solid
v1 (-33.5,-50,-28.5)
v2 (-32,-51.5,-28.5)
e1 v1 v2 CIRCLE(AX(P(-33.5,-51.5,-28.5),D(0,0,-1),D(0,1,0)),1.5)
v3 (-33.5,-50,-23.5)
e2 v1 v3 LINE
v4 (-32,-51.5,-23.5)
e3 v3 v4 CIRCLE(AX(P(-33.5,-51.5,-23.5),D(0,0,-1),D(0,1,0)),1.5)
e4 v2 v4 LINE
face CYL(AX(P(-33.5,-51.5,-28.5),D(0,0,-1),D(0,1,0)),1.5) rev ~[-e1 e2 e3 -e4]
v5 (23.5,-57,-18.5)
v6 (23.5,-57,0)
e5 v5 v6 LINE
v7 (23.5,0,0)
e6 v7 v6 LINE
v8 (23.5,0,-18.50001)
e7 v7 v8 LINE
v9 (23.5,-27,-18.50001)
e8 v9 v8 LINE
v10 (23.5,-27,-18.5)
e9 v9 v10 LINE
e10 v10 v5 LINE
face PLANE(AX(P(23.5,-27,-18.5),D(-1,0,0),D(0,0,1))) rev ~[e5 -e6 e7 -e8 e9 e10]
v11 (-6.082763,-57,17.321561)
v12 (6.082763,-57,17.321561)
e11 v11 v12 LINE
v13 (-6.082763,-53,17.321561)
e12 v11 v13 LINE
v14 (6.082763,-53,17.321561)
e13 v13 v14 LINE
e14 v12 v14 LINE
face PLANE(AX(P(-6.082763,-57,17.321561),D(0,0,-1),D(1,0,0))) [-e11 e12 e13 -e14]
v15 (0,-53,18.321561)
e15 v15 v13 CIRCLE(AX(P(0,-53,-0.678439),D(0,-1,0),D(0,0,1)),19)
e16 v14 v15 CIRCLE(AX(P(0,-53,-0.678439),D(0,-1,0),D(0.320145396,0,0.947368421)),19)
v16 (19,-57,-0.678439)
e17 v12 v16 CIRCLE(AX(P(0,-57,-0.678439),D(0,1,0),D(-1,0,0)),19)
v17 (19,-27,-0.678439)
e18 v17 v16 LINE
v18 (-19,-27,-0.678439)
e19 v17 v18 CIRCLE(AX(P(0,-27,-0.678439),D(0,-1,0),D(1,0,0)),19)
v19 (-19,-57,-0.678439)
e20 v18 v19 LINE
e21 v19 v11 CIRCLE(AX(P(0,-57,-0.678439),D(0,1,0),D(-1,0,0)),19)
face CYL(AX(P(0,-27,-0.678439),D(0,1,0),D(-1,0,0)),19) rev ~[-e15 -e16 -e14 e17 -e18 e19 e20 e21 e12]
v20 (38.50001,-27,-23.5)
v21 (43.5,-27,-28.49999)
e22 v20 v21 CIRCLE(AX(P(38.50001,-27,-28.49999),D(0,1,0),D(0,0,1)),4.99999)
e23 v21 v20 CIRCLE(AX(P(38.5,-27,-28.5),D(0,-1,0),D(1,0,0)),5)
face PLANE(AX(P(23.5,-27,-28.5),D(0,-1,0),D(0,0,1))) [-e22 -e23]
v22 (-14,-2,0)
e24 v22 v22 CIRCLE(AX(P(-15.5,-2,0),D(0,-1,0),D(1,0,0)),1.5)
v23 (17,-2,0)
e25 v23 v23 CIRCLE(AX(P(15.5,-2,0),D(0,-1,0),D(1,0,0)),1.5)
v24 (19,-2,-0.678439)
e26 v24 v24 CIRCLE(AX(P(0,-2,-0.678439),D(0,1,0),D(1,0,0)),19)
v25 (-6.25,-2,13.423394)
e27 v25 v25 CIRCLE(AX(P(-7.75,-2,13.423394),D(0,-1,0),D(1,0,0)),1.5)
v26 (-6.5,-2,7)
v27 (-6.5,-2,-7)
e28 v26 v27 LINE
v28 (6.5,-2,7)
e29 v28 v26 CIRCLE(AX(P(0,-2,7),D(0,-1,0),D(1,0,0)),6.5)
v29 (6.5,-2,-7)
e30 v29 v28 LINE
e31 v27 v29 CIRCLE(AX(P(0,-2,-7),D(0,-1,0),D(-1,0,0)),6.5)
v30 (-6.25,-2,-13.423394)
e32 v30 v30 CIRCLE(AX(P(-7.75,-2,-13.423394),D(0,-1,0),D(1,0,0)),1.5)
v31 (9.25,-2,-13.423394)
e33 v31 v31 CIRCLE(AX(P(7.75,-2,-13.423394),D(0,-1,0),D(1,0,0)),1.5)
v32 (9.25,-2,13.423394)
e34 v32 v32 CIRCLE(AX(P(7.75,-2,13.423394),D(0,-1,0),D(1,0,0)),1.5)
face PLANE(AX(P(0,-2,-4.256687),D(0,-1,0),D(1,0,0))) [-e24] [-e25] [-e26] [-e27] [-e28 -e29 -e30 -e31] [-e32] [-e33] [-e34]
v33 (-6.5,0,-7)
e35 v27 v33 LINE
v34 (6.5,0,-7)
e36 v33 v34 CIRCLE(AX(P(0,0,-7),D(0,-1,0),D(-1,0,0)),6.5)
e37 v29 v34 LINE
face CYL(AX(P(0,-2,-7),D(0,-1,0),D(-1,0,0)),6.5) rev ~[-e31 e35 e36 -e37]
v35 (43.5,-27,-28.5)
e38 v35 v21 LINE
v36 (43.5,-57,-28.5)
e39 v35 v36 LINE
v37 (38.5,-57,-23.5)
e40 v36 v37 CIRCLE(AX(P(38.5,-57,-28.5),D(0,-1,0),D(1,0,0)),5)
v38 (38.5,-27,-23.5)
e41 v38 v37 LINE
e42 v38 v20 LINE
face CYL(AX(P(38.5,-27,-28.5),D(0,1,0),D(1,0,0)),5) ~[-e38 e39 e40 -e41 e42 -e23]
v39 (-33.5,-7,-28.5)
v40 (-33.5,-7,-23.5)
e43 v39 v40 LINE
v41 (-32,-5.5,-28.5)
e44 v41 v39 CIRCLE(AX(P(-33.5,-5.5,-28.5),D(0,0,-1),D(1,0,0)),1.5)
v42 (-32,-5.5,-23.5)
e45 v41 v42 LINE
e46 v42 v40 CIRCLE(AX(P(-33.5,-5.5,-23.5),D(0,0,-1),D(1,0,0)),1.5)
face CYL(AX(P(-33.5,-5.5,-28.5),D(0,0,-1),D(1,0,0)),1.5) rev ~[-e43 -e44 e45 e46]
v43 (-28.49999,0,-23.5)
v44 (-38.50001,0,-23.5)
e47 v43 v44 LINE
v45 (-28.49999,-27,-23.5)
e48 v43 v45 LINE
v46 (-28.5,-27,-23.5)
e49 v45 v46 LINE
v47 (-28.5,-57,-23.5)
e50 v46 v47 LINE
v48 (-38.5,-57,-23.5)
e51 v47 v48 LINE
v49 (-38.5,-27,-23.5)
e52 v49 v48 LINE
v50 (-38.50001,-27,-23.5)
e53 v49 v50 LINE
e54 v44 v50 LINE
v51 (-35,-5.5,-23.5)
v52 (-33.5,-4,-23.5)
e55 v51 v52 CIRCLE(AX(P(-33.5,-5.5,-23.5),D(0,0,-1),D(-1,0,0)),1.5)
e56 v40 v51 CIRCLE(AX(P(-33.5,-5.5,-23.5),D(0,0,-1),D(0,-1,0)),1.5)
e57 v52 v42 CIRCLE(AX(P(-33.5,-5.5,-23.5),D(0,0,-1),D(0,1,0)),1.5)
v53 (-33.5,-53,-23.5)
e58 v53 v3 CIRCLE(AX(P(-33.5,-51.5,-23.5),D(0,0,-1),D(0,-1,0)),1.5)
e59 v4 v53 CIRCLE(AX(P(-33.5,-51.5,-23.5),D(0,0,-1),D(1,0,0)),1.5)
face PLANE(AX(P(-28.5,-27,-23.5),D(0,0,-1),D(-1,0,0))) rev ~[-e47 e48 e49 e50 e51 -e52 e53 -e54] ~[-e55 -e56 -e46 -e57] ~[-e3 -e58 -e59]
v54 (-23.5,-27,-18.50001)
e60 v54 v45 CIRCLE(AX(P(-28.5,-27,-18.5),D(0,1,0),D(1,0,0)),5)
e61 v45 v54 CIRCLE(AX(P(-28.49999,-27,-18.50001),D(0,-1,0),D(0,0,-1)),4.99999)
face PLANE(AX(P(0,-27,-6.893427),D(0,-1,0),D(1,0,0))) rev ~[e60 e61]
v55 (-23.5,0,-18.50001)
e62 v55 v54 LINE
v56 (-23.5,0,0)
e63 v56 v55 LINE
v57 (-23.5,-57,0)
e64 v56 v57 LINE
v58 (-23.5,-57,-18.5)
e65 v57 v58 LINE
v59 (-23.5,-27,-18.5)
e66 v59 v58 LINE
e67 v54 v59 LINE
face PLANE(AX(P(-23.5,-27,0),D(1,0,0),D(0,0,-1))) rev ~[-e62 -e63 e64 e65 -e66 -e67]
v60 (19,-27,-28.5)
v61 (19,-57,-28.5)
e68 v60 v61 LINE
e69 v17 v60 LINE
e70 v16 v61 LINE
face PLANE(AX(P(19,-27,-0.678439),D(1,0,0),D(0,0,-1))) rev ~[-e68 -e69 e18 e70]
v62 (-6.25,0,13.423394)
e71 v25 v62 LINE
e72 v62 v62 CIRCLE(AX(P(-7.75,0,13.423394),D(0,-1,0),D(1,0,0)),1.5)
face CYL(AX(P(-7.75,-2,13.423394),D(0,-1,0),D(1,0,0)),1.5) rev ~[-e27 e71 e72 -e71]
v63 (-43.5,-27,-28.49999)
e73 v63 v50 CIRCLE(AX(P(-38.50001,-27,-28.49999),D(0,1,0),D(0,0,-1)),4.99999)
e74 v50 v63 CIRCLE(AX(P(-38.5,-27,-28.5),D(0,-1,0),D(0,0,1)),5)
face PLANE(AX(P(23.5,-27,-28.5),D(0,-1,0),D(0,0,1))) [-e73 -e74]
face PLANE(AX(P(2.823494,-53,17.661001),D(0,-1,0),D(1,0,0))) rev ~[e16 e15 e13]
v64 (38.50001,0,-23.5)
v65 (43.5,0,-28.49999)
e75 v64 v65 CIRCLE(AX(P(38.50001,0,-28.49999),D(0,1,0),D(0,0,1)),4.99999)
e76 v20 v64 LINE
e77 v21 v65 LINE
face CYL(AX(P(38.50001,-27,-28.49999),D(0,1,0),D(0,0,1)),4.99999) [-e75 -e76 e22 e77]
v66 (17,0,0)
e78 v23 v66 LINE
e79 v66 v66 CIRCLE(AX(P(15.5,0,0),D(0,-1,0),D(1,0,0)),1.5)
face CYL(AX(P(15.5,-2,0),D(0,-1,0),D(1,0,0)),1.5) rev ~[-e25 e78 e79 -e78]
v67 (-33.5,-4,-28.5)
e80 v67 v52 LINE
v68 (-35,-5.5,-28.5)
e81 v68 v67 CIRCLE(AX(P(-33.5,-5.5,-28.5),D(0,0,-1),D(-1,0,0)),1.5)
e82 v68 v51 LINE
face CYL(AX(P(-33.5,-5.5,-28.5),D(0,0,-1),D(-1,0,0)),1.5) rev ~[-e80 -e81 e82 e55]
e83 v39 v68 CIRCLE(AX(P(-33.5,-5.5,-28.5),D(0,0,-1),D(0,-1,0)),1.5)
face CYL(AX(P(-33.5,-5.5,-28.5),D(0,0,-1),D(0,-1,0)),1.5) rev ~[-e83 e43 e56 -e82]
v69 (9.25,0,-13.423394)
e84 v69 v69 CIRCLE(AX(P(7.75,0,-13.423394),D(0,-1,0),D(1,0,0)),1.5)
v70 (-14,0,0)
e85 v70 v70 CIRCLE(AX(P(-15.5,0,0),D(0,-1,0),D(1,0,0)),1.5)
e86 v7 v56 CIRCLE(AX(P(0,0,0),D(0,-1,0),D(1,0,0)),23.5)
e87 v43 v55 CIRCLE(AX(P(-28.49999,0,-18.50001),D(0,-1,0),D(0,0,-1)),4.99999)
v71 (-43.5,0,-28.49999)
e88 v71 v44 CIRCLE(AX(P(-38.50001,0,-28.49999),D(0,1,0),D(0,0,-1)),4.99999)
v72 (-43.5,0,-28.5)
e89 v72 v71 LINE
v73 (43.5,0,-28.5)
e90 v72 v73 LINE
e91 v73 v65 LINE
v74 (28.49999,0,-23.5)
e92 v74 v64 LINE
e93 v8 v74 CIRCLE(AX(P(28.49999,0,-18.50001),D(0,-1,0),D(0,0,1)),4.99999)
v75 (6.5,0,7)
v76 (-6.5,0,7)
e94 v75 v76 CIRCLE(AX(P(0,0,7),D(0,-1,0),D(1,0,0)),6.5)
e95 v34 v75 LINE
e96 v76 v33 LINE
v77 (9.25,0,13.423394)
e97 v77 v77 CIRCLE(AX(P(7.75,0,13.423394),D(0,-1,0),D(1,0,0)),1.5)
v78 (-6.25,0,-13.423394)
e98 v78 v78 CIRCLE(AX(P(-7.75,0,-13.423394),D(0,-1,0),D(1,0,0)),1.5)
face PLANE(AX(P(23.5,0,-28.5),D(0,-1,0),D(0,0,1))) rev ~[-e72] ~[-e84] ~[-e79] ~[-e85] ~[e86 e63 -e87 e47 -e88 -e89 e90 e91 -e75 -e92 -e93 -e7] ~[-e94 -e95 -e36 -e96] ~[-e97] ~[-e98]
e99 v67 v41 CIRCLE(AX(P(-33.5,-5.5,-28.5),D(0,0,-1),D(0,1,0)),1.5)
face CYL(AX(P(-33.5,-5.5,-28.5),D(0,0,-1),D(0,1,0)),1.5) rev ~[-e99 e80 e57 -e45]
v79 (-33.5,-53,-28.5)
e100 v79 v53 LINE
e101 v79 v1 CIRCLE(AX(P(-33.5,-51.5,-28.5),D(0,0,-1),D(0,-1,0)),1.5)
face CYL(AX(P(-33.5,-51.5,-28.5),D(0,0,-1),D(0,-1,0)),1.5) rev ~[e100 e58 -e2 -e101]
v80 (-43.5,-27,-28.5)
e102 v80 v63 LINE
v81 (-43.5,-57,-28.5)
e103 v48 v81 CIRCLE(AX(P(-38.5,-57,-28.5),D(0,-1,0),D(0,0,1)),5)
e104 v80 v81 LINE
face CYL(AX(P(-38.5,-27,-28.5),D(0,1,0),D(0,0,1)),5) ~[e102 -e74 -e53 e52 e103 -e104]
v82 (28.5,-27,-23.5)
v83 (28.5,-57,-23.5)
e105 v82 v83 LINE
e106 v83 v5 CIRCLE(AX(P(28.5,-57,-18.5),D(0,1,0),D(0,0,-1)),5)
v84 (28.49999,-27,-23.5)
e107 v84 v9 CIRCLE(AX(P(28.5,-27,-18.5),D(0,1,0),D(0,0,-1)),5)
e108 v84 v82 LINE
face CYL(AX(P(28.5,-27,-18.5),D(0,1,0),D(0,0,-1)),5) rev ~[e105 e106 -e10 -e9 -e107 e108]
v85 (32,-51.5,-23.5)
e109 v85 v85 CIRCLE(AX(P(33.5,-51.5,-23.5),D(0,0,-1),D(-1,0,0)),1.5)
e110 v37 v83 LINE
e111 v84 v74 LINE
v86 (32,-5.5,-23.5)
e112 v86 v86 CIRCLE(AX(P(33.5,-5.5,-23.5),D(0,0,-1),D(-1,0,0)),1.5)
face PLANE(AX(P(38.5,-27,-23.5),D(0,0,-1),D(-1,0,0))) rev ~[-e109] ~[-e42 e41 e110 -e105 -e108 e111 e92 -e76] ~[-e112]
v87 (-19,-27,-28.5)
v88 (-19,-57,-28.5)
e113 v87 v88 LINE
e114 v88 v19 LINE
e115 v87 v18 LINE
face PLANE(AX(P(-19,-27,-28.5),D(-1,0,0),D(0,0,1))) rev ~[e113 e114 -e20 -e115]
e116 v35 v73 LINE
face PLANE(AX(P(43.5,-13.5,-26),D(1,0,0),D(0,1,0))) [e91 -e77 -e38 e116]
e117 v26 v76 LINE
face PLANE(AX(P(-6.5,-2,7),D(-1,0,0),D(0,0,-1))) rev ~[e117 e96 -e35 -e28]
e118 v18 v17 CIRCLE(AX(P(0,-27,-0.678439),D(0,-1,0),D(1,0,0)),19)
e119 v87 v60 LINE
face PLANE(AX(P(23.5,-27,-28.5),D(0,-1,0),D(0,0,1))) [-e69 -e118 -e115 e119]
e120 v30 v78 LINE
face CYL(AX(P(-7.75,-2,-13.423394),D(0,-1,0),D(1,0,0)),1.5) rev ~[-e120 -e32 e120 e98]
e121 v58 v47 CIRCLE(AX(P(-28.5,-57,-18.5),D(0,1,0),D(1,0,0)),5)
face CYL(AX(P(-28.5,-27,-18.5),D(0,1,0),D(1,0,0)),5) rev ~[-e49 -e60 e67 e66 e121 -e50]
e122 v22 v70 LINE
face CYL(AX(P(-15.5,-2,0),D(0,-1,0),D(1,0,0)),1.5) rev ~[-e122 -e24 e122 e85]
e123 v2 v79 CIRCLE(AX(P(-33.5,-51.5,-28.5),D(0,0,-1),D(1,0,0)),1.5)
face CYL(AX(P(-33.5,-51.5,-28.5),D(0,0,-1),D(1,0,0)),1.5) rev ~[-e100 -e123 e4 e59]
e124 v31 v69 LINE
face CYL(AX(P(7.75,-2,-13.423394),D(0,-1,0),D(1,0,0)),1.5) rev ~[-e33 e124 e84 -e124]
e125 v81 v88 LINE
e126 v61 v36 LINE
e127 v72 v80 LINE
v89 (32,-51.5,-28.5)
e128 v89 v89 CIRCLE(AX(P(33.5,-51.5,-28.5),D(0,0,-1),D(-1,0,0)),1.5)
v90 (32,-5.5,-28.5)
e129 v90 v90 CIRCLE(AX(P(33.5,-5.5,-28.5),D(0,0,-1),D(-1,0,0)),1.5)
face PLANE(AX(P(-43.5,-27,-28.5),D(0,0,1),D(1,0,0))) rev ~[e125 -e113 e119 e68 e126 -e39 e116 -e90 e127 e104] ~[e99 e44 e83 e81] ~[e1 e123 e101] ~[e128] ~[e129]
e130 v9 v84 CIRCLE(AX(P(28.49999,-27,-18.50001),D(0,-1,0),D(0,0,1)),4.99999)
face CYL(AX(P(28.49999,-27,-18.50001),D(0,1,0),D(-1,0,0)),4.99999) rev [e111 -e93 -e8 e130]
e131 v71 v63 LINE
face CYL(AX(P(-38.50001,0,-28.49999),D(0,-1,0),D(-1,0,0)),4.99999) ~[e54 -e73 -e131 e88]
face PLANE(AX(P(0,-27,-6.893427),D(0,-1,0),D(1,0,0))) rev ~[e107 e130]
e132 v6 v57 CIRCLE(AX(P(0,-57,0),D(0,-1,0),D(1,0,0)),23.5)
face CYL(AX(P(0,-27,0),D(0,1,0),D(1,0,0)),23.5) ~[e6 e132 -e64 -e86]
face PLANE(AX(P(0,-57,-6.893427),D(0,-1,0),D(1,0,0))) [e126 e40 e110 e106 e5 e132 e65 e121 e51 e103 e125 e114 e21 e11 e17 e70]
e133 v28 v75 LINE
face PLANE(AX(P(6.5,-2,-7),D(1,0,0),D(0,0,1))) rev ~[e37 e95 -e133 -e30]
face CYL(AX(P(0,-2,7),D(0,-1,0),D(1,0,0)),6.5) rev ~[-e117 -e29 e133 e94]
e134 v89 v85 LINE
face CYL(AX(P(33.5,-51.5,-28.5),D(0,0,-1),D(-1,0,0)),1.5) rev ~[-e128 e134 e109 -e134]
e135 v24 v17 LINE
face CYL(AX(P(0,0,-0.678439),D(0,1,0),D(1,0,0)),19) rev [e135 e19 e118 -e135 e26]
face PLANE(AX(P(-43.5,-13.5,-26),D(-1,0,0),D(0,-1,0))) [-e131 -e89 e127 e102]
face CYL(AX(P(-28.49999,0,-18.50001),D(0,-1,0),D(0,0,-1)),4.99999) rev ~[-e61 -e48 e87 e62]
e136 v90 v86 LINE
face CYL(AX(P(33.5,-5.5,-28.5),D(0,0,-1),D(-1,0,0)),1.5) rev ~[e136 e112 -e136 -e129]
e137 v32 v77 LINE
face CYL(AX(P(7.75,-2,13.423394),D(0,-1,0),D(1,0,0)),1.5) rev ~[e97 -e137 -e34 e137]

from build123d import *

# Parameters (mm, degrees)
F1_DEPTH  = 2
F2_R      = 1.5
F3_DEPTH  = 5
F4_R      = 19
F5_DEPTH  = 27
F6_W      = 47
F6_H      = 27
F7_DEPTH  = 5
F8_W      = 27
F8_H      = 5
F9_DEPTH  = 20
F10_W     = 27
F10_H     = 5
F11_DEPTH = 20
F12_R     = 4.99999
F14_DEPTH = 30
F16_DEPTH = 4
F18_DEPTH = 25


# Not quite as in the source:
# - a fillet or chamfer is up to 0.001 mm smaller than in the source, because OpenCascade refuses the exact size


with BuildPart() as f1:
    # F0 (on Front) → F1 (new body)
    with BuildSketch(Plane.XZ):
        with BuildLine():
            Line((-23.5, -23.5), (0, -23.5))
            Line((0, -23.5), (23.5, -23.5))
            Line((23.5, -23.5), (23.5, 0))
            ThreePointArc((23.5, 0), (0, 23.5), (-23.5, 0))
            Line((-23.5, 0), (-23.5, -23.5))
        make_face()
    extrude(amount=F1_DEPTH)

    # F2 (on face) → F3 (cut)
    with BuildSketch(Plane.XZ.offset(2)):
        with Locations((15.5, 0)):
            Circle(F2_R)
        with Locations((7.75, 13.4233937587)):
            Circle(F2_R)
        with Locations((-7.75, 13.4233937587)):
            Circle(F2_R)
        with Locations((-15.5, 0)):
            Circle(F2_R)
        with Locations((-7.75, -13.4233937587)):
            Circle(F2_R)
        with Locations((7.75, -13.4233937587)):
            Circle(F2_R)
        with BuildLine():
            Line((6.5, -7), (6.5, 7))
            ThreePointArc((6.5, 7), (0, 13.5), (-6.5, 7))
            Line((-6.5, 7), (-6.5, -7))
            ThreePointArc((-6.5, -7), (0, -13.5), (6.5, -7))
        make_face()
    extrude(amount=-F3_DEPTH, mode=Mode.SUBTRACT)

    # F4 (on Front) → F5 (join)
    with BuildSketch(Plane.XZ):
        with BuildLine():
            ThreePointArc((23.5, 0), (0, 23.5), (-23.5, 0))
            Line((-23.5, 0), (-23.5, -23.5))
            Line((-23.5, -23.5), (23.5, -23.5))
            Line((23.5, -23.5), (23.5, 0))
        make_face()
        with Locations((0, -0.6784388353)):
            Circle(F4_R, mode=Mode.SUBTRACT)
    extrude(amount=F5_DEPTH)

    # F6 (on face) → F7 (join)
    with BuildSketch(Plane(origin=(0, 0, -23.5), x_dir=(1, 0, 0), z_dir=(0, 0, -1))):
        with Locations((0, 13.5)):
            Rectangle(F6_W, F6_H)
    extrude(amount=F7_DEPTH)

    # F8 (on face) → F9 (join)
    with BuildSketch(Plane(origin=(-23.5, 0, 0), x_dir=(0, -1, 0), z_dir=(-1, 0, 0))):
        with Locations((13.5, -26)):
            Rectangle(F8_W, F8_H)
    extrude(amount=F9_DEPTH)

    # F10 (on face) → F11 (join)
    with BuildSketch(Plane.YZ.offset(23.5)):
        with Locations((-13.5, -26)):
            Rectangle(F10_W, F10_H)
    extrude(amount=F11_DEPTH)

    # F12 (radius 5 in the source; OpenCascade refuses exactly that, so slightly less here)
    f12_edges = [f1.edges().sort_by_distance(p)[0] for p in [
        (23.5, -13.5, -23.5),
        (43.5, -13.5, -23.5),
        (-23.5, -13.5, -23.5),
        (-43.5, -13.5, -23.5),
    ]]
    fillet(f12_edges, radius=F12_R)

    # F13 (on face) → F14 (join)
    with BuildSketch(Plane.XZ.offset(27)):
        with BuildLine():
            Line((23.5, -18.5), (23.5, 0))
            ThreePointArc((23.5, 0), (0, 23.5), (-23.5, 0))
            Line((-23.5, 0), (-23.5, -18.5))
            ThreePointArc((-23.5, -18.5), (-24.9644660941, -22.0355339059), (-28.5, -23.5))
            Line((-28.5, -23.5), (-38.5, -23.5))
            ThreePointArc((-38.5, -23.5), (-42.0355339059, -24.9644660941), (-43.5, -28.5))
            Line((-43.5, -28.5), (-19, -28.5))
            Line((-19, -28.5), (-19, -0.6784388353))
            ThreePointArc((-19, -0.6784388353), (0, 18.3215611647), (19, -0.6784388353))
            Line((19, -0.6784388353), (19, -28.5))
            Line((19, -28.5), (43.5, -28.5))
            ThreePointArc((43.5, -28.5), (42.0355339059, -24.9644660941), (38.5, -23.5))
            Line((38.5, -23.5), (28.5, -23.5))
            ThreePointArc((28.5, -23.5), (24.9644660941, -22.0355339059), (23.5, -18.5))
        make_face()
    extrude(amount=F14_DEPTH)

    # F15 (on face) → F16 (join)
    with BuildSketch(Plane.XZ.offset(57)):
        with BuildLine():
            ThreePointArc((6.0827625303, 17.3215611647), (3.0822070015, 18.0698944239), (0, 18.3215611647))
            Line((0, 18.3215611647), (0, 17.3215611647))
            Line((0, 17.3215611647), (6.0827625303, 17.3215611647))
        make_face()
        with BuildLine():
            Line((0, 17.3215611647), (0, 18.3215611647))
            ThreePointArc((0, 18.3215611647), (-3.0822070015, 18.0698944239), (-6.0827625303, 17.3215611647))
            Line((-6.0827625303, 17.3215611647), (0, 17.3215611647))
        make_face()
    extrude(amount=-F16_DEPTH)

    # F17 (on face) → F18 (cut)
    with BuildSketch(Plane(origin=(0, 0, -28.5), x_dir=(1, 0, 0), z_dir=(0, 0, -1))):
        with BuildLine():
            ThreePointArc((-35, 5.5), (-34.5606601718, 4.4393398282), (-33.5, 4))
            Line((-33.5, 4), (-33.5, 5.5))
            Line((-33.5, 5.5), (-35, 5.5))
        make_face()
        with BuildLine():
            ThreePointArc((35, 51.5), (33.5, 53), (32, 51.5))
            ThreePointArc((32, 51.5), (33.5, 50), (35, 51.5))
        make_face()
        with BuildLine():
            ThreePointArc((-33.5, 53), (-35, 51.5), (-33.5, 50))
            Line((-33.5, 50), (-33.5, 51.5))
            Line((-33.5, 51.5), (-33.5, 53))
        make_face()
        with BuildLine():
            Line((-33.5, 51.5), (-33.5, 50))
            ThreePointArc((-33.5, 50), (-32.4393398282, 50.4393398282), (-32, 51.5))
            Line((-32, 51.5), (-33.5, 51.5))
        make_face()
        with BuildLine():
            ThreePointArc((35, 5.5), (33.5, 7), (32, 5.5))
            ThreePointArc((32, 5.5), (33.5, 4), (35, 5.5))
        make_face()
        with BuildLine():
            Line((-33.5, 5.5), (-33.5, 4))
            ThreePointArc((-33.5, 4), (-32.4393398282, 4.4393398282), (-32, 5.5))
            Line((-32, 5.5), (-33.5, 5.5))
        make_face()
        with BuildLine():
            Line((-33.5, 7), (-33.5, 5.5))
            Line((-33.5, 5.5), (-32, 5.5))
            ThreePointArc((-32, 5.5), (-32.4393398282, 6.5606601718), (-33.5, 7))
        make_face()
        with BuildLine():
            Line((-35, 5.5), (-33.5, 5.5))
            Line((-33.5, 5.5), (-33.5, 7))
            ThreePointArc((-33.5, 7), (-34.5606601718, 6.5606601718), (-35, 5.5))
        make_face()
        with BuildLine():
            ThreePointArc((-32, 51.5), (-32.4393398282, 52.5606601718), (-33.5, 53))
            Line((-33.5, 53), (-33.5, 51.5))
            Line((-33.5, 51.5), (-32, 51.5))
        make_face()
    extrude(amount=-F18_DEPTH, mode=Mode.SUBTRACT)


solid = f1.part
